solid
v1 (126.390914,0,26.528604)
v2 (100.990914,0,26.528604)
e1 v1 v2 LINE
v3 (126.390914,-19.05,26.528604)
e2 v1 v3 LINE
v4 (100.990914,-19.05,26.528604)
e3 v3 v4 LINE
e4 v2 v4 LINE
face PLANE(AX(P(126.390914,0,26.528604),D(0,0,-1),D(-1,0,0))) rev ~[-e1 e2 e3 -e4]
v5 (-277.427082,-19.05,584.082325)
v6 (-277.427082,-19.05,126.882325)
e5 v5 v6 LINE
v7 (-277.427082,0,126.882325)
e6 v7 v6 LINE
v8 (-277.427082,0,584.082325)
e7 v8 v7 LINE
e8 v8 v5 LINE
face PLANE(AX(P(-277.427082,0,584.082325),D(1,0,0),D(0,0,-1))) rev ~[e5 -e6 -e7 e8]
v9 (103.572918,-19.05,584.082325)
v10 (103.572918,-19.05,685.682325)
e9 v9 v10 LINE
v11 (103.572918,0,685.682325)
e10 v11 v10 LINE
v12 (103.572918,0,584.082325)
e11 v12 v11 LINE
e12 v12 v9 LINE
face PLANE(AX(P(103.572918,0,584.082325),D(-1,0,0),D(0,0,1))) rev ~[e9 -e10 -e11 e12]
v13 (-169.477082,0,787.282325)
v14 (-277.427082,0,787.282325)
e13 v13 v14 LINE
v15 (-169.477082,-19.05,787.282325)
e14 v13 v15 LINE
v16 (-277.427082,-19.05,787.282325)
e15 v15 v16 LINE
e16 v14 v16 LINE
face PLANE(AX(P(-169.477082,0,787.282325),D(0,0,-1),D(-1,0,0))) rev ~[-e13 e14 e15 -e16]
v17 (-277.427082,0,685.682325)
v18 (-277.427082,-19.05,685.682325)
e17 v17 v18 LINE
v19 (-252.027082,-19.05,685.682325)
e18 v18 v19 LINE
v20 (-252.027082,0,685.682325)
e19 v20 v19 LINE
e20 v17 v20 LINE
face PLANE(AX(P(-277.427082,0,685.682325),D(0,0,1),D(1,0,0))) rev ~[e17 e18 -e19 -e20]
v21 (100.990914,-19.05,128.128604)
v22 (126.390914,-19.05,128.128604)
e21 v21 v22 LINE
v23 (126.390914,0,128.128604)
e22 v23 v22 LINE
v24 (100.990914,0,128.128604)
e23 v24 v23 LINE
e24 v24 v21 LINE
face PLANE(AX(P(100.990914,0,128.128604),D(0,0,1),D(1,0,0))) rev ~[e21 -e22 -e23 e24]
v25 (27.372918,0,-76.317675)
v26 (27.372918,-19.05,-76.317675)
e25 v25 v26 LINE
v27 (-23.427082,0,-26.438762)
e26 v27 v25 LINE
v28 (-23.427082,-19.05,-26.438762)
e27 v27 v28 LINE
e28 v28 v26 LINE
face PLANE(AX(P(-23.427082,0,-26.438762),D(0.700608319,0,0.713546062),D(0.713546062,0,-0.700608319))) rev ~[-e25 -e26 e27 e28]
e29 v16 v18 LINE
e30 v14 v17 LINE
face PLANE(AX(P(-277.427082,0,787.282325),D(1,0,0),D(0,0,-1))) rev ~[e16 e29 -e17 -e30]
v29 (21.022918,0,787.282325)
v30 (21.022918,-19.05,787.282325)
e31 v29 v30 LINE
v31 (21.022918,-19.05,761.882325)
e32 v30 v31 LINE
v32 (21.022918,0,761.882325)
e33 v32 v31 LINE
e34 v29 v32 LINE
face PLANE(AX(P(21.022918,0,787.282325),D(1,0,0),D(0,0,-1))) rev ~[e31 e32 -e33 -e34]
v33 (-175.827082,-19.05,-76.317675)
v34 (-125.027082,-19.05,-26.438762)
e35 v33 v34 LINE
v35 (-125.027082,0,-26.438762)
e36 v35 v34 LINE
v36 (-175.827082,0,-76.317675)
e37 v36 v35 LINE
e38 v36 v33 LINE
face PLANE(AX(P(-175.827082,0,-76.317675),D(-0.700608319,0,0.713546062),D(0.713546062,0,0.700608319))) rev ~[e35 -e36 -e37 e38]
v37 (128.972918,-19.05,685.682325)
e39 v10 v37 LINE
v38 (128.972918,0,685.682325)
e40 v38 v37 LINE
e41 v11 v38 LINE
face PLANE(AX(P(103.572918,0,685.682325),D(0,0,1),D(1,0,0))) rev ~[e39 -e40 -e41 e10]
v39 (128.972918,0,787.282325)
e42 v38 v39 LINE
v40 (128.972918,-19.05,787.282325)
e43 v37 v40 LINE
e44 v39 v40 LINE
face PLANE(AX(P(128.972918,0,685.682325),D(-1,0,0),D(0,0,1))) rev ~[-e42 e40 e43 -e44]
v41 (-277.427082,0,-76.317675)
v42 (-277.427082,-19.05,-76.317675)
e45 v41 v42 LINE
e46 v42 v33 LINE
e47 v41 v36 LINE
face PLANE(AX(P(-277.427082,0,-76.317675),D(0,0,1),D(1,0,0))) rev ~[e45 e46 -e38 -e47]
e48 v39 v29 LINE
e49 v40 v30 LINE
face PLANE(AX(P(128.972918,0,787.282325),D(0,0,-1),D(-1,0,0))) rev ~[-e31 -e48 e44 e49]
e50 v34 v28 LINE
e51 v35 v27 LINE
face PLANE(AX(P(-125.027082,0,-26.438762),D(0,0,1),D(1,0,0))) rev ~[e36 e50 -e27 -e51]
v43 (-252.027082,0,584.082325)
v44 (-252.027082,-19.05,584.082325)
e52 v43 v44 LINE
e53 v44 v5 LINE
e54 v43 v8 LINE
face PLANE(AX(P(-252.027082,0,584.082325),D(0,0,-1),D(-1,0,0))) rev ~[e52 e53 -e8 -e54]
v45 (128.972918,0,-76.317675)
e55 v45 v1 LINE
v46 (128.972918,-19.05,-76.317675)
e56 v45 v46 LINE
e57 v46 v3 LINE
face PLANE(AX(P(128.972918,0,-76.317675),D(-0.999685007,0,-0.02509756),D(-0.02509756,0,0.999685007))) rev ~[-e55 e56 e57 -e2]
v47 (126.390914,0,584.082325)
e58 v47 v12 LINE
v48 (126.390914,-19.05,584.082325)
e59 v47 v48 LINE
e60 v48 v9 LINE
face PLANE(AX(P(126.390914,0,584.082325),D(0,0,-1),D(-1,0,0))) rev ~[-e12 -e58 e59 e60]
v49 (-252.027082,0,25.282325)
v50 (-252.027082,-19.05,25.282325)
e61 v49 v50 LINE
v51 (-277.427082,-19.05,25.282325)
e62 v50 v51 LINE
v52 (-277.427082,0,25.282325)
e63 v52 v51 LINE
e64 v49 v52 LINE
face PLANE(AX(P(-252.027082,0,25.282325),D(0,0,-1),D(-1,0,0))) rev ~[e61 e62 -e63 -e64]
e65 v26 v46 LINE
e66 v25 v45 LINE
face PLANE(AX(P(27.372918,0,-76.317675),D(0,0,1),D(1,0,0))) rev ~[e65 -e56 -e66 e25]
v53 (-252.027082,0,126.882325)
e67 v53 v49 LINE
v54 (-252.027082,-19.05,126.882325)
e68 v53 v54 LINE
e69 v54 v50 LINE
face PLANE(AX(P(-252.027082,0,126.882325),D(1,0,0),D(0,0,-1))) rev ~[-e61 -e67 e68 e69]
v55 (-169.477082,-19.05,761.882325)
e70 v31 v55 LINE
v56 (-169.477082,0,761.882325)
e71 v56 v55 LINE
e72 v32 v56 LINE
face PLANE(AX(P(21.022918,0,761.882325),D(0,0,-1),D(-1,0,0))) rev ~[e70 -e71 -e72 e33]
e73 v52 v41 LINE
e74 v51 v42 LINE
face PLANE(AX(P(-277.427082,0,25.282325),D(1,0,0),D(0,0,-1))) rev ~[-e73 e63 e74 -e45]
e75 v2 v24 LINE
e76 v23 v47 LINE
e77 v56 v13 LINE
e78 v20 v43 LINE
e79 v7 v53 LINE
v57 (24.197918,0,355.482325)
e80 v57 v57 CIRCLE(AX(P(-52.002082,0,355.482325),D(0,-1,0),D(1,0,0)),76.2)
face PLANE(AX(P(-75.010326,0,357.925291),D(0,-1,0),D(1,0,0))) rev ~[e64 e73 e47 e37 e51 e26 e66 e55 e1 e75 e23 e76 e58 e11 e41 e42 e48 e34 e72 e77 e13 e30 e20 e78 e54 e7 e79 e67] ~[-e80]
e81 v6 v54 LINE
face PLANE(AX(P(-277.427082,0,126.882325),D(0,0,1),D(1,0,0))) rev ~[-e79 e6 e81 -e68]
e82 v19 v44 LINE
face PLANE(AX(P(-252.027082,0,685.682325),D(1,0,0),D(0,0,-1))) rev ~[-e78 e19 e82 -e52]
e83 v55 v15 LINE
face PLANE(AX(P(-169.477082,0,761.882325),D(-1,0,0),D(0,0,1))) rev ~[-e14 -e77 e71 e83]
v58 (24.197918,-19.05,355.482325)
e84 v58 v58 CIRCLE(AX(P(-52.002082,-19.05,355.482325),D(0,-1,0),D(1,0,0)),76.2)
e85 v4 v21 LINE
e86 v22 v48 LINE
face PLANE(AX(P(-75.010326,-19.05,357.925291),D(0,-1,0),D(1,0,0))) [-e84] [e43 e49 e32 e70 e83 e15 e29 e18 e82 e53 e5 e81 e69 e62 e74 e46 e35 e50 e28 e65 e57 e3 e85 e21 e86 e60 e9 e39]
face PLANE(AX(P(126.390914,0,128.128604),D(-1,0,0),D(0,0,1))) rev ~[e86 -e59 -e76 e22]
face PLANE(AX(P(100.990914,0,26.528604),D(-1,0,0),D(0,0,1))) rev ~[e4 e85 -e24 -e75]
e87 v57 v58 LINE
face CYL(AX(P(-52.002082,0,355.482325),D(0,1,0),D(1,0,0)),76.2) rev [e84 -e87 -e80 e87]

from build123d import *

# Parameters (mm, degrees)
F0_R     = 76.2
F1_DEPTH = 19.05


# Not quite as in the source:
# - a length typed as a fraction of an inch, garbled in the dataset ("3 / 203.2 mm" for 3/8 in), is restored
# - a feature names something its author has since deleted; it is built from what else it names


with BuildPart() as f1:
    # F0 (on Front) → F1 (new body)
    with BuildSketch(Plane.XZ):
        Polygon((-277.4270822048, 25.2823245883), (-277.4270822048, -76.3176754117), (-175.8270822048, -76.3176754117), (-125.0270822048, -26.4387615025), (-23.4270822048, -26.4387615025), (27.3729177952, -76.3176754117), (128.9729177952, -76.3176754117), (126.3909138083, 26.5286043286), (100.9909138083, 26.5286043286), (100.9909138083, 128.1286043286), (126.3909138083, 128.1286043286), (126.3909138083, 584.0823245883), (103.5729177952, 584.0823245883), (103.5729177952, 685.6823245883), (128.9729177952, 685.6823245883), (128.9729177952, 787.2823245883), (21.0229177952, 787.2823245883), (21.0229177952, 761.8823245883), (-169.4770822048, 761.8823245883), (-169.4770822048, 787.2823245883), (-277.4270822048, 787.2823245883), (-277.4270822048, 685.6823245883), (-252.0270822048, 685.6823245883), (-252.0270822048, 584.0823245883), (-277.4270822048, 584.0823245883), (-277.4270822048, 126.8823245883), (-252.0270822048, 126.8823245883), (-252.0270822048, 25.2823245883), align=None)
        with Locations((-52.0020822048, 355.4823245883)):
            Circle(F0_R, mode=Mode.SUBTRACT)
    extrude(amount=F1_DEPTH)


solid = f1.part
